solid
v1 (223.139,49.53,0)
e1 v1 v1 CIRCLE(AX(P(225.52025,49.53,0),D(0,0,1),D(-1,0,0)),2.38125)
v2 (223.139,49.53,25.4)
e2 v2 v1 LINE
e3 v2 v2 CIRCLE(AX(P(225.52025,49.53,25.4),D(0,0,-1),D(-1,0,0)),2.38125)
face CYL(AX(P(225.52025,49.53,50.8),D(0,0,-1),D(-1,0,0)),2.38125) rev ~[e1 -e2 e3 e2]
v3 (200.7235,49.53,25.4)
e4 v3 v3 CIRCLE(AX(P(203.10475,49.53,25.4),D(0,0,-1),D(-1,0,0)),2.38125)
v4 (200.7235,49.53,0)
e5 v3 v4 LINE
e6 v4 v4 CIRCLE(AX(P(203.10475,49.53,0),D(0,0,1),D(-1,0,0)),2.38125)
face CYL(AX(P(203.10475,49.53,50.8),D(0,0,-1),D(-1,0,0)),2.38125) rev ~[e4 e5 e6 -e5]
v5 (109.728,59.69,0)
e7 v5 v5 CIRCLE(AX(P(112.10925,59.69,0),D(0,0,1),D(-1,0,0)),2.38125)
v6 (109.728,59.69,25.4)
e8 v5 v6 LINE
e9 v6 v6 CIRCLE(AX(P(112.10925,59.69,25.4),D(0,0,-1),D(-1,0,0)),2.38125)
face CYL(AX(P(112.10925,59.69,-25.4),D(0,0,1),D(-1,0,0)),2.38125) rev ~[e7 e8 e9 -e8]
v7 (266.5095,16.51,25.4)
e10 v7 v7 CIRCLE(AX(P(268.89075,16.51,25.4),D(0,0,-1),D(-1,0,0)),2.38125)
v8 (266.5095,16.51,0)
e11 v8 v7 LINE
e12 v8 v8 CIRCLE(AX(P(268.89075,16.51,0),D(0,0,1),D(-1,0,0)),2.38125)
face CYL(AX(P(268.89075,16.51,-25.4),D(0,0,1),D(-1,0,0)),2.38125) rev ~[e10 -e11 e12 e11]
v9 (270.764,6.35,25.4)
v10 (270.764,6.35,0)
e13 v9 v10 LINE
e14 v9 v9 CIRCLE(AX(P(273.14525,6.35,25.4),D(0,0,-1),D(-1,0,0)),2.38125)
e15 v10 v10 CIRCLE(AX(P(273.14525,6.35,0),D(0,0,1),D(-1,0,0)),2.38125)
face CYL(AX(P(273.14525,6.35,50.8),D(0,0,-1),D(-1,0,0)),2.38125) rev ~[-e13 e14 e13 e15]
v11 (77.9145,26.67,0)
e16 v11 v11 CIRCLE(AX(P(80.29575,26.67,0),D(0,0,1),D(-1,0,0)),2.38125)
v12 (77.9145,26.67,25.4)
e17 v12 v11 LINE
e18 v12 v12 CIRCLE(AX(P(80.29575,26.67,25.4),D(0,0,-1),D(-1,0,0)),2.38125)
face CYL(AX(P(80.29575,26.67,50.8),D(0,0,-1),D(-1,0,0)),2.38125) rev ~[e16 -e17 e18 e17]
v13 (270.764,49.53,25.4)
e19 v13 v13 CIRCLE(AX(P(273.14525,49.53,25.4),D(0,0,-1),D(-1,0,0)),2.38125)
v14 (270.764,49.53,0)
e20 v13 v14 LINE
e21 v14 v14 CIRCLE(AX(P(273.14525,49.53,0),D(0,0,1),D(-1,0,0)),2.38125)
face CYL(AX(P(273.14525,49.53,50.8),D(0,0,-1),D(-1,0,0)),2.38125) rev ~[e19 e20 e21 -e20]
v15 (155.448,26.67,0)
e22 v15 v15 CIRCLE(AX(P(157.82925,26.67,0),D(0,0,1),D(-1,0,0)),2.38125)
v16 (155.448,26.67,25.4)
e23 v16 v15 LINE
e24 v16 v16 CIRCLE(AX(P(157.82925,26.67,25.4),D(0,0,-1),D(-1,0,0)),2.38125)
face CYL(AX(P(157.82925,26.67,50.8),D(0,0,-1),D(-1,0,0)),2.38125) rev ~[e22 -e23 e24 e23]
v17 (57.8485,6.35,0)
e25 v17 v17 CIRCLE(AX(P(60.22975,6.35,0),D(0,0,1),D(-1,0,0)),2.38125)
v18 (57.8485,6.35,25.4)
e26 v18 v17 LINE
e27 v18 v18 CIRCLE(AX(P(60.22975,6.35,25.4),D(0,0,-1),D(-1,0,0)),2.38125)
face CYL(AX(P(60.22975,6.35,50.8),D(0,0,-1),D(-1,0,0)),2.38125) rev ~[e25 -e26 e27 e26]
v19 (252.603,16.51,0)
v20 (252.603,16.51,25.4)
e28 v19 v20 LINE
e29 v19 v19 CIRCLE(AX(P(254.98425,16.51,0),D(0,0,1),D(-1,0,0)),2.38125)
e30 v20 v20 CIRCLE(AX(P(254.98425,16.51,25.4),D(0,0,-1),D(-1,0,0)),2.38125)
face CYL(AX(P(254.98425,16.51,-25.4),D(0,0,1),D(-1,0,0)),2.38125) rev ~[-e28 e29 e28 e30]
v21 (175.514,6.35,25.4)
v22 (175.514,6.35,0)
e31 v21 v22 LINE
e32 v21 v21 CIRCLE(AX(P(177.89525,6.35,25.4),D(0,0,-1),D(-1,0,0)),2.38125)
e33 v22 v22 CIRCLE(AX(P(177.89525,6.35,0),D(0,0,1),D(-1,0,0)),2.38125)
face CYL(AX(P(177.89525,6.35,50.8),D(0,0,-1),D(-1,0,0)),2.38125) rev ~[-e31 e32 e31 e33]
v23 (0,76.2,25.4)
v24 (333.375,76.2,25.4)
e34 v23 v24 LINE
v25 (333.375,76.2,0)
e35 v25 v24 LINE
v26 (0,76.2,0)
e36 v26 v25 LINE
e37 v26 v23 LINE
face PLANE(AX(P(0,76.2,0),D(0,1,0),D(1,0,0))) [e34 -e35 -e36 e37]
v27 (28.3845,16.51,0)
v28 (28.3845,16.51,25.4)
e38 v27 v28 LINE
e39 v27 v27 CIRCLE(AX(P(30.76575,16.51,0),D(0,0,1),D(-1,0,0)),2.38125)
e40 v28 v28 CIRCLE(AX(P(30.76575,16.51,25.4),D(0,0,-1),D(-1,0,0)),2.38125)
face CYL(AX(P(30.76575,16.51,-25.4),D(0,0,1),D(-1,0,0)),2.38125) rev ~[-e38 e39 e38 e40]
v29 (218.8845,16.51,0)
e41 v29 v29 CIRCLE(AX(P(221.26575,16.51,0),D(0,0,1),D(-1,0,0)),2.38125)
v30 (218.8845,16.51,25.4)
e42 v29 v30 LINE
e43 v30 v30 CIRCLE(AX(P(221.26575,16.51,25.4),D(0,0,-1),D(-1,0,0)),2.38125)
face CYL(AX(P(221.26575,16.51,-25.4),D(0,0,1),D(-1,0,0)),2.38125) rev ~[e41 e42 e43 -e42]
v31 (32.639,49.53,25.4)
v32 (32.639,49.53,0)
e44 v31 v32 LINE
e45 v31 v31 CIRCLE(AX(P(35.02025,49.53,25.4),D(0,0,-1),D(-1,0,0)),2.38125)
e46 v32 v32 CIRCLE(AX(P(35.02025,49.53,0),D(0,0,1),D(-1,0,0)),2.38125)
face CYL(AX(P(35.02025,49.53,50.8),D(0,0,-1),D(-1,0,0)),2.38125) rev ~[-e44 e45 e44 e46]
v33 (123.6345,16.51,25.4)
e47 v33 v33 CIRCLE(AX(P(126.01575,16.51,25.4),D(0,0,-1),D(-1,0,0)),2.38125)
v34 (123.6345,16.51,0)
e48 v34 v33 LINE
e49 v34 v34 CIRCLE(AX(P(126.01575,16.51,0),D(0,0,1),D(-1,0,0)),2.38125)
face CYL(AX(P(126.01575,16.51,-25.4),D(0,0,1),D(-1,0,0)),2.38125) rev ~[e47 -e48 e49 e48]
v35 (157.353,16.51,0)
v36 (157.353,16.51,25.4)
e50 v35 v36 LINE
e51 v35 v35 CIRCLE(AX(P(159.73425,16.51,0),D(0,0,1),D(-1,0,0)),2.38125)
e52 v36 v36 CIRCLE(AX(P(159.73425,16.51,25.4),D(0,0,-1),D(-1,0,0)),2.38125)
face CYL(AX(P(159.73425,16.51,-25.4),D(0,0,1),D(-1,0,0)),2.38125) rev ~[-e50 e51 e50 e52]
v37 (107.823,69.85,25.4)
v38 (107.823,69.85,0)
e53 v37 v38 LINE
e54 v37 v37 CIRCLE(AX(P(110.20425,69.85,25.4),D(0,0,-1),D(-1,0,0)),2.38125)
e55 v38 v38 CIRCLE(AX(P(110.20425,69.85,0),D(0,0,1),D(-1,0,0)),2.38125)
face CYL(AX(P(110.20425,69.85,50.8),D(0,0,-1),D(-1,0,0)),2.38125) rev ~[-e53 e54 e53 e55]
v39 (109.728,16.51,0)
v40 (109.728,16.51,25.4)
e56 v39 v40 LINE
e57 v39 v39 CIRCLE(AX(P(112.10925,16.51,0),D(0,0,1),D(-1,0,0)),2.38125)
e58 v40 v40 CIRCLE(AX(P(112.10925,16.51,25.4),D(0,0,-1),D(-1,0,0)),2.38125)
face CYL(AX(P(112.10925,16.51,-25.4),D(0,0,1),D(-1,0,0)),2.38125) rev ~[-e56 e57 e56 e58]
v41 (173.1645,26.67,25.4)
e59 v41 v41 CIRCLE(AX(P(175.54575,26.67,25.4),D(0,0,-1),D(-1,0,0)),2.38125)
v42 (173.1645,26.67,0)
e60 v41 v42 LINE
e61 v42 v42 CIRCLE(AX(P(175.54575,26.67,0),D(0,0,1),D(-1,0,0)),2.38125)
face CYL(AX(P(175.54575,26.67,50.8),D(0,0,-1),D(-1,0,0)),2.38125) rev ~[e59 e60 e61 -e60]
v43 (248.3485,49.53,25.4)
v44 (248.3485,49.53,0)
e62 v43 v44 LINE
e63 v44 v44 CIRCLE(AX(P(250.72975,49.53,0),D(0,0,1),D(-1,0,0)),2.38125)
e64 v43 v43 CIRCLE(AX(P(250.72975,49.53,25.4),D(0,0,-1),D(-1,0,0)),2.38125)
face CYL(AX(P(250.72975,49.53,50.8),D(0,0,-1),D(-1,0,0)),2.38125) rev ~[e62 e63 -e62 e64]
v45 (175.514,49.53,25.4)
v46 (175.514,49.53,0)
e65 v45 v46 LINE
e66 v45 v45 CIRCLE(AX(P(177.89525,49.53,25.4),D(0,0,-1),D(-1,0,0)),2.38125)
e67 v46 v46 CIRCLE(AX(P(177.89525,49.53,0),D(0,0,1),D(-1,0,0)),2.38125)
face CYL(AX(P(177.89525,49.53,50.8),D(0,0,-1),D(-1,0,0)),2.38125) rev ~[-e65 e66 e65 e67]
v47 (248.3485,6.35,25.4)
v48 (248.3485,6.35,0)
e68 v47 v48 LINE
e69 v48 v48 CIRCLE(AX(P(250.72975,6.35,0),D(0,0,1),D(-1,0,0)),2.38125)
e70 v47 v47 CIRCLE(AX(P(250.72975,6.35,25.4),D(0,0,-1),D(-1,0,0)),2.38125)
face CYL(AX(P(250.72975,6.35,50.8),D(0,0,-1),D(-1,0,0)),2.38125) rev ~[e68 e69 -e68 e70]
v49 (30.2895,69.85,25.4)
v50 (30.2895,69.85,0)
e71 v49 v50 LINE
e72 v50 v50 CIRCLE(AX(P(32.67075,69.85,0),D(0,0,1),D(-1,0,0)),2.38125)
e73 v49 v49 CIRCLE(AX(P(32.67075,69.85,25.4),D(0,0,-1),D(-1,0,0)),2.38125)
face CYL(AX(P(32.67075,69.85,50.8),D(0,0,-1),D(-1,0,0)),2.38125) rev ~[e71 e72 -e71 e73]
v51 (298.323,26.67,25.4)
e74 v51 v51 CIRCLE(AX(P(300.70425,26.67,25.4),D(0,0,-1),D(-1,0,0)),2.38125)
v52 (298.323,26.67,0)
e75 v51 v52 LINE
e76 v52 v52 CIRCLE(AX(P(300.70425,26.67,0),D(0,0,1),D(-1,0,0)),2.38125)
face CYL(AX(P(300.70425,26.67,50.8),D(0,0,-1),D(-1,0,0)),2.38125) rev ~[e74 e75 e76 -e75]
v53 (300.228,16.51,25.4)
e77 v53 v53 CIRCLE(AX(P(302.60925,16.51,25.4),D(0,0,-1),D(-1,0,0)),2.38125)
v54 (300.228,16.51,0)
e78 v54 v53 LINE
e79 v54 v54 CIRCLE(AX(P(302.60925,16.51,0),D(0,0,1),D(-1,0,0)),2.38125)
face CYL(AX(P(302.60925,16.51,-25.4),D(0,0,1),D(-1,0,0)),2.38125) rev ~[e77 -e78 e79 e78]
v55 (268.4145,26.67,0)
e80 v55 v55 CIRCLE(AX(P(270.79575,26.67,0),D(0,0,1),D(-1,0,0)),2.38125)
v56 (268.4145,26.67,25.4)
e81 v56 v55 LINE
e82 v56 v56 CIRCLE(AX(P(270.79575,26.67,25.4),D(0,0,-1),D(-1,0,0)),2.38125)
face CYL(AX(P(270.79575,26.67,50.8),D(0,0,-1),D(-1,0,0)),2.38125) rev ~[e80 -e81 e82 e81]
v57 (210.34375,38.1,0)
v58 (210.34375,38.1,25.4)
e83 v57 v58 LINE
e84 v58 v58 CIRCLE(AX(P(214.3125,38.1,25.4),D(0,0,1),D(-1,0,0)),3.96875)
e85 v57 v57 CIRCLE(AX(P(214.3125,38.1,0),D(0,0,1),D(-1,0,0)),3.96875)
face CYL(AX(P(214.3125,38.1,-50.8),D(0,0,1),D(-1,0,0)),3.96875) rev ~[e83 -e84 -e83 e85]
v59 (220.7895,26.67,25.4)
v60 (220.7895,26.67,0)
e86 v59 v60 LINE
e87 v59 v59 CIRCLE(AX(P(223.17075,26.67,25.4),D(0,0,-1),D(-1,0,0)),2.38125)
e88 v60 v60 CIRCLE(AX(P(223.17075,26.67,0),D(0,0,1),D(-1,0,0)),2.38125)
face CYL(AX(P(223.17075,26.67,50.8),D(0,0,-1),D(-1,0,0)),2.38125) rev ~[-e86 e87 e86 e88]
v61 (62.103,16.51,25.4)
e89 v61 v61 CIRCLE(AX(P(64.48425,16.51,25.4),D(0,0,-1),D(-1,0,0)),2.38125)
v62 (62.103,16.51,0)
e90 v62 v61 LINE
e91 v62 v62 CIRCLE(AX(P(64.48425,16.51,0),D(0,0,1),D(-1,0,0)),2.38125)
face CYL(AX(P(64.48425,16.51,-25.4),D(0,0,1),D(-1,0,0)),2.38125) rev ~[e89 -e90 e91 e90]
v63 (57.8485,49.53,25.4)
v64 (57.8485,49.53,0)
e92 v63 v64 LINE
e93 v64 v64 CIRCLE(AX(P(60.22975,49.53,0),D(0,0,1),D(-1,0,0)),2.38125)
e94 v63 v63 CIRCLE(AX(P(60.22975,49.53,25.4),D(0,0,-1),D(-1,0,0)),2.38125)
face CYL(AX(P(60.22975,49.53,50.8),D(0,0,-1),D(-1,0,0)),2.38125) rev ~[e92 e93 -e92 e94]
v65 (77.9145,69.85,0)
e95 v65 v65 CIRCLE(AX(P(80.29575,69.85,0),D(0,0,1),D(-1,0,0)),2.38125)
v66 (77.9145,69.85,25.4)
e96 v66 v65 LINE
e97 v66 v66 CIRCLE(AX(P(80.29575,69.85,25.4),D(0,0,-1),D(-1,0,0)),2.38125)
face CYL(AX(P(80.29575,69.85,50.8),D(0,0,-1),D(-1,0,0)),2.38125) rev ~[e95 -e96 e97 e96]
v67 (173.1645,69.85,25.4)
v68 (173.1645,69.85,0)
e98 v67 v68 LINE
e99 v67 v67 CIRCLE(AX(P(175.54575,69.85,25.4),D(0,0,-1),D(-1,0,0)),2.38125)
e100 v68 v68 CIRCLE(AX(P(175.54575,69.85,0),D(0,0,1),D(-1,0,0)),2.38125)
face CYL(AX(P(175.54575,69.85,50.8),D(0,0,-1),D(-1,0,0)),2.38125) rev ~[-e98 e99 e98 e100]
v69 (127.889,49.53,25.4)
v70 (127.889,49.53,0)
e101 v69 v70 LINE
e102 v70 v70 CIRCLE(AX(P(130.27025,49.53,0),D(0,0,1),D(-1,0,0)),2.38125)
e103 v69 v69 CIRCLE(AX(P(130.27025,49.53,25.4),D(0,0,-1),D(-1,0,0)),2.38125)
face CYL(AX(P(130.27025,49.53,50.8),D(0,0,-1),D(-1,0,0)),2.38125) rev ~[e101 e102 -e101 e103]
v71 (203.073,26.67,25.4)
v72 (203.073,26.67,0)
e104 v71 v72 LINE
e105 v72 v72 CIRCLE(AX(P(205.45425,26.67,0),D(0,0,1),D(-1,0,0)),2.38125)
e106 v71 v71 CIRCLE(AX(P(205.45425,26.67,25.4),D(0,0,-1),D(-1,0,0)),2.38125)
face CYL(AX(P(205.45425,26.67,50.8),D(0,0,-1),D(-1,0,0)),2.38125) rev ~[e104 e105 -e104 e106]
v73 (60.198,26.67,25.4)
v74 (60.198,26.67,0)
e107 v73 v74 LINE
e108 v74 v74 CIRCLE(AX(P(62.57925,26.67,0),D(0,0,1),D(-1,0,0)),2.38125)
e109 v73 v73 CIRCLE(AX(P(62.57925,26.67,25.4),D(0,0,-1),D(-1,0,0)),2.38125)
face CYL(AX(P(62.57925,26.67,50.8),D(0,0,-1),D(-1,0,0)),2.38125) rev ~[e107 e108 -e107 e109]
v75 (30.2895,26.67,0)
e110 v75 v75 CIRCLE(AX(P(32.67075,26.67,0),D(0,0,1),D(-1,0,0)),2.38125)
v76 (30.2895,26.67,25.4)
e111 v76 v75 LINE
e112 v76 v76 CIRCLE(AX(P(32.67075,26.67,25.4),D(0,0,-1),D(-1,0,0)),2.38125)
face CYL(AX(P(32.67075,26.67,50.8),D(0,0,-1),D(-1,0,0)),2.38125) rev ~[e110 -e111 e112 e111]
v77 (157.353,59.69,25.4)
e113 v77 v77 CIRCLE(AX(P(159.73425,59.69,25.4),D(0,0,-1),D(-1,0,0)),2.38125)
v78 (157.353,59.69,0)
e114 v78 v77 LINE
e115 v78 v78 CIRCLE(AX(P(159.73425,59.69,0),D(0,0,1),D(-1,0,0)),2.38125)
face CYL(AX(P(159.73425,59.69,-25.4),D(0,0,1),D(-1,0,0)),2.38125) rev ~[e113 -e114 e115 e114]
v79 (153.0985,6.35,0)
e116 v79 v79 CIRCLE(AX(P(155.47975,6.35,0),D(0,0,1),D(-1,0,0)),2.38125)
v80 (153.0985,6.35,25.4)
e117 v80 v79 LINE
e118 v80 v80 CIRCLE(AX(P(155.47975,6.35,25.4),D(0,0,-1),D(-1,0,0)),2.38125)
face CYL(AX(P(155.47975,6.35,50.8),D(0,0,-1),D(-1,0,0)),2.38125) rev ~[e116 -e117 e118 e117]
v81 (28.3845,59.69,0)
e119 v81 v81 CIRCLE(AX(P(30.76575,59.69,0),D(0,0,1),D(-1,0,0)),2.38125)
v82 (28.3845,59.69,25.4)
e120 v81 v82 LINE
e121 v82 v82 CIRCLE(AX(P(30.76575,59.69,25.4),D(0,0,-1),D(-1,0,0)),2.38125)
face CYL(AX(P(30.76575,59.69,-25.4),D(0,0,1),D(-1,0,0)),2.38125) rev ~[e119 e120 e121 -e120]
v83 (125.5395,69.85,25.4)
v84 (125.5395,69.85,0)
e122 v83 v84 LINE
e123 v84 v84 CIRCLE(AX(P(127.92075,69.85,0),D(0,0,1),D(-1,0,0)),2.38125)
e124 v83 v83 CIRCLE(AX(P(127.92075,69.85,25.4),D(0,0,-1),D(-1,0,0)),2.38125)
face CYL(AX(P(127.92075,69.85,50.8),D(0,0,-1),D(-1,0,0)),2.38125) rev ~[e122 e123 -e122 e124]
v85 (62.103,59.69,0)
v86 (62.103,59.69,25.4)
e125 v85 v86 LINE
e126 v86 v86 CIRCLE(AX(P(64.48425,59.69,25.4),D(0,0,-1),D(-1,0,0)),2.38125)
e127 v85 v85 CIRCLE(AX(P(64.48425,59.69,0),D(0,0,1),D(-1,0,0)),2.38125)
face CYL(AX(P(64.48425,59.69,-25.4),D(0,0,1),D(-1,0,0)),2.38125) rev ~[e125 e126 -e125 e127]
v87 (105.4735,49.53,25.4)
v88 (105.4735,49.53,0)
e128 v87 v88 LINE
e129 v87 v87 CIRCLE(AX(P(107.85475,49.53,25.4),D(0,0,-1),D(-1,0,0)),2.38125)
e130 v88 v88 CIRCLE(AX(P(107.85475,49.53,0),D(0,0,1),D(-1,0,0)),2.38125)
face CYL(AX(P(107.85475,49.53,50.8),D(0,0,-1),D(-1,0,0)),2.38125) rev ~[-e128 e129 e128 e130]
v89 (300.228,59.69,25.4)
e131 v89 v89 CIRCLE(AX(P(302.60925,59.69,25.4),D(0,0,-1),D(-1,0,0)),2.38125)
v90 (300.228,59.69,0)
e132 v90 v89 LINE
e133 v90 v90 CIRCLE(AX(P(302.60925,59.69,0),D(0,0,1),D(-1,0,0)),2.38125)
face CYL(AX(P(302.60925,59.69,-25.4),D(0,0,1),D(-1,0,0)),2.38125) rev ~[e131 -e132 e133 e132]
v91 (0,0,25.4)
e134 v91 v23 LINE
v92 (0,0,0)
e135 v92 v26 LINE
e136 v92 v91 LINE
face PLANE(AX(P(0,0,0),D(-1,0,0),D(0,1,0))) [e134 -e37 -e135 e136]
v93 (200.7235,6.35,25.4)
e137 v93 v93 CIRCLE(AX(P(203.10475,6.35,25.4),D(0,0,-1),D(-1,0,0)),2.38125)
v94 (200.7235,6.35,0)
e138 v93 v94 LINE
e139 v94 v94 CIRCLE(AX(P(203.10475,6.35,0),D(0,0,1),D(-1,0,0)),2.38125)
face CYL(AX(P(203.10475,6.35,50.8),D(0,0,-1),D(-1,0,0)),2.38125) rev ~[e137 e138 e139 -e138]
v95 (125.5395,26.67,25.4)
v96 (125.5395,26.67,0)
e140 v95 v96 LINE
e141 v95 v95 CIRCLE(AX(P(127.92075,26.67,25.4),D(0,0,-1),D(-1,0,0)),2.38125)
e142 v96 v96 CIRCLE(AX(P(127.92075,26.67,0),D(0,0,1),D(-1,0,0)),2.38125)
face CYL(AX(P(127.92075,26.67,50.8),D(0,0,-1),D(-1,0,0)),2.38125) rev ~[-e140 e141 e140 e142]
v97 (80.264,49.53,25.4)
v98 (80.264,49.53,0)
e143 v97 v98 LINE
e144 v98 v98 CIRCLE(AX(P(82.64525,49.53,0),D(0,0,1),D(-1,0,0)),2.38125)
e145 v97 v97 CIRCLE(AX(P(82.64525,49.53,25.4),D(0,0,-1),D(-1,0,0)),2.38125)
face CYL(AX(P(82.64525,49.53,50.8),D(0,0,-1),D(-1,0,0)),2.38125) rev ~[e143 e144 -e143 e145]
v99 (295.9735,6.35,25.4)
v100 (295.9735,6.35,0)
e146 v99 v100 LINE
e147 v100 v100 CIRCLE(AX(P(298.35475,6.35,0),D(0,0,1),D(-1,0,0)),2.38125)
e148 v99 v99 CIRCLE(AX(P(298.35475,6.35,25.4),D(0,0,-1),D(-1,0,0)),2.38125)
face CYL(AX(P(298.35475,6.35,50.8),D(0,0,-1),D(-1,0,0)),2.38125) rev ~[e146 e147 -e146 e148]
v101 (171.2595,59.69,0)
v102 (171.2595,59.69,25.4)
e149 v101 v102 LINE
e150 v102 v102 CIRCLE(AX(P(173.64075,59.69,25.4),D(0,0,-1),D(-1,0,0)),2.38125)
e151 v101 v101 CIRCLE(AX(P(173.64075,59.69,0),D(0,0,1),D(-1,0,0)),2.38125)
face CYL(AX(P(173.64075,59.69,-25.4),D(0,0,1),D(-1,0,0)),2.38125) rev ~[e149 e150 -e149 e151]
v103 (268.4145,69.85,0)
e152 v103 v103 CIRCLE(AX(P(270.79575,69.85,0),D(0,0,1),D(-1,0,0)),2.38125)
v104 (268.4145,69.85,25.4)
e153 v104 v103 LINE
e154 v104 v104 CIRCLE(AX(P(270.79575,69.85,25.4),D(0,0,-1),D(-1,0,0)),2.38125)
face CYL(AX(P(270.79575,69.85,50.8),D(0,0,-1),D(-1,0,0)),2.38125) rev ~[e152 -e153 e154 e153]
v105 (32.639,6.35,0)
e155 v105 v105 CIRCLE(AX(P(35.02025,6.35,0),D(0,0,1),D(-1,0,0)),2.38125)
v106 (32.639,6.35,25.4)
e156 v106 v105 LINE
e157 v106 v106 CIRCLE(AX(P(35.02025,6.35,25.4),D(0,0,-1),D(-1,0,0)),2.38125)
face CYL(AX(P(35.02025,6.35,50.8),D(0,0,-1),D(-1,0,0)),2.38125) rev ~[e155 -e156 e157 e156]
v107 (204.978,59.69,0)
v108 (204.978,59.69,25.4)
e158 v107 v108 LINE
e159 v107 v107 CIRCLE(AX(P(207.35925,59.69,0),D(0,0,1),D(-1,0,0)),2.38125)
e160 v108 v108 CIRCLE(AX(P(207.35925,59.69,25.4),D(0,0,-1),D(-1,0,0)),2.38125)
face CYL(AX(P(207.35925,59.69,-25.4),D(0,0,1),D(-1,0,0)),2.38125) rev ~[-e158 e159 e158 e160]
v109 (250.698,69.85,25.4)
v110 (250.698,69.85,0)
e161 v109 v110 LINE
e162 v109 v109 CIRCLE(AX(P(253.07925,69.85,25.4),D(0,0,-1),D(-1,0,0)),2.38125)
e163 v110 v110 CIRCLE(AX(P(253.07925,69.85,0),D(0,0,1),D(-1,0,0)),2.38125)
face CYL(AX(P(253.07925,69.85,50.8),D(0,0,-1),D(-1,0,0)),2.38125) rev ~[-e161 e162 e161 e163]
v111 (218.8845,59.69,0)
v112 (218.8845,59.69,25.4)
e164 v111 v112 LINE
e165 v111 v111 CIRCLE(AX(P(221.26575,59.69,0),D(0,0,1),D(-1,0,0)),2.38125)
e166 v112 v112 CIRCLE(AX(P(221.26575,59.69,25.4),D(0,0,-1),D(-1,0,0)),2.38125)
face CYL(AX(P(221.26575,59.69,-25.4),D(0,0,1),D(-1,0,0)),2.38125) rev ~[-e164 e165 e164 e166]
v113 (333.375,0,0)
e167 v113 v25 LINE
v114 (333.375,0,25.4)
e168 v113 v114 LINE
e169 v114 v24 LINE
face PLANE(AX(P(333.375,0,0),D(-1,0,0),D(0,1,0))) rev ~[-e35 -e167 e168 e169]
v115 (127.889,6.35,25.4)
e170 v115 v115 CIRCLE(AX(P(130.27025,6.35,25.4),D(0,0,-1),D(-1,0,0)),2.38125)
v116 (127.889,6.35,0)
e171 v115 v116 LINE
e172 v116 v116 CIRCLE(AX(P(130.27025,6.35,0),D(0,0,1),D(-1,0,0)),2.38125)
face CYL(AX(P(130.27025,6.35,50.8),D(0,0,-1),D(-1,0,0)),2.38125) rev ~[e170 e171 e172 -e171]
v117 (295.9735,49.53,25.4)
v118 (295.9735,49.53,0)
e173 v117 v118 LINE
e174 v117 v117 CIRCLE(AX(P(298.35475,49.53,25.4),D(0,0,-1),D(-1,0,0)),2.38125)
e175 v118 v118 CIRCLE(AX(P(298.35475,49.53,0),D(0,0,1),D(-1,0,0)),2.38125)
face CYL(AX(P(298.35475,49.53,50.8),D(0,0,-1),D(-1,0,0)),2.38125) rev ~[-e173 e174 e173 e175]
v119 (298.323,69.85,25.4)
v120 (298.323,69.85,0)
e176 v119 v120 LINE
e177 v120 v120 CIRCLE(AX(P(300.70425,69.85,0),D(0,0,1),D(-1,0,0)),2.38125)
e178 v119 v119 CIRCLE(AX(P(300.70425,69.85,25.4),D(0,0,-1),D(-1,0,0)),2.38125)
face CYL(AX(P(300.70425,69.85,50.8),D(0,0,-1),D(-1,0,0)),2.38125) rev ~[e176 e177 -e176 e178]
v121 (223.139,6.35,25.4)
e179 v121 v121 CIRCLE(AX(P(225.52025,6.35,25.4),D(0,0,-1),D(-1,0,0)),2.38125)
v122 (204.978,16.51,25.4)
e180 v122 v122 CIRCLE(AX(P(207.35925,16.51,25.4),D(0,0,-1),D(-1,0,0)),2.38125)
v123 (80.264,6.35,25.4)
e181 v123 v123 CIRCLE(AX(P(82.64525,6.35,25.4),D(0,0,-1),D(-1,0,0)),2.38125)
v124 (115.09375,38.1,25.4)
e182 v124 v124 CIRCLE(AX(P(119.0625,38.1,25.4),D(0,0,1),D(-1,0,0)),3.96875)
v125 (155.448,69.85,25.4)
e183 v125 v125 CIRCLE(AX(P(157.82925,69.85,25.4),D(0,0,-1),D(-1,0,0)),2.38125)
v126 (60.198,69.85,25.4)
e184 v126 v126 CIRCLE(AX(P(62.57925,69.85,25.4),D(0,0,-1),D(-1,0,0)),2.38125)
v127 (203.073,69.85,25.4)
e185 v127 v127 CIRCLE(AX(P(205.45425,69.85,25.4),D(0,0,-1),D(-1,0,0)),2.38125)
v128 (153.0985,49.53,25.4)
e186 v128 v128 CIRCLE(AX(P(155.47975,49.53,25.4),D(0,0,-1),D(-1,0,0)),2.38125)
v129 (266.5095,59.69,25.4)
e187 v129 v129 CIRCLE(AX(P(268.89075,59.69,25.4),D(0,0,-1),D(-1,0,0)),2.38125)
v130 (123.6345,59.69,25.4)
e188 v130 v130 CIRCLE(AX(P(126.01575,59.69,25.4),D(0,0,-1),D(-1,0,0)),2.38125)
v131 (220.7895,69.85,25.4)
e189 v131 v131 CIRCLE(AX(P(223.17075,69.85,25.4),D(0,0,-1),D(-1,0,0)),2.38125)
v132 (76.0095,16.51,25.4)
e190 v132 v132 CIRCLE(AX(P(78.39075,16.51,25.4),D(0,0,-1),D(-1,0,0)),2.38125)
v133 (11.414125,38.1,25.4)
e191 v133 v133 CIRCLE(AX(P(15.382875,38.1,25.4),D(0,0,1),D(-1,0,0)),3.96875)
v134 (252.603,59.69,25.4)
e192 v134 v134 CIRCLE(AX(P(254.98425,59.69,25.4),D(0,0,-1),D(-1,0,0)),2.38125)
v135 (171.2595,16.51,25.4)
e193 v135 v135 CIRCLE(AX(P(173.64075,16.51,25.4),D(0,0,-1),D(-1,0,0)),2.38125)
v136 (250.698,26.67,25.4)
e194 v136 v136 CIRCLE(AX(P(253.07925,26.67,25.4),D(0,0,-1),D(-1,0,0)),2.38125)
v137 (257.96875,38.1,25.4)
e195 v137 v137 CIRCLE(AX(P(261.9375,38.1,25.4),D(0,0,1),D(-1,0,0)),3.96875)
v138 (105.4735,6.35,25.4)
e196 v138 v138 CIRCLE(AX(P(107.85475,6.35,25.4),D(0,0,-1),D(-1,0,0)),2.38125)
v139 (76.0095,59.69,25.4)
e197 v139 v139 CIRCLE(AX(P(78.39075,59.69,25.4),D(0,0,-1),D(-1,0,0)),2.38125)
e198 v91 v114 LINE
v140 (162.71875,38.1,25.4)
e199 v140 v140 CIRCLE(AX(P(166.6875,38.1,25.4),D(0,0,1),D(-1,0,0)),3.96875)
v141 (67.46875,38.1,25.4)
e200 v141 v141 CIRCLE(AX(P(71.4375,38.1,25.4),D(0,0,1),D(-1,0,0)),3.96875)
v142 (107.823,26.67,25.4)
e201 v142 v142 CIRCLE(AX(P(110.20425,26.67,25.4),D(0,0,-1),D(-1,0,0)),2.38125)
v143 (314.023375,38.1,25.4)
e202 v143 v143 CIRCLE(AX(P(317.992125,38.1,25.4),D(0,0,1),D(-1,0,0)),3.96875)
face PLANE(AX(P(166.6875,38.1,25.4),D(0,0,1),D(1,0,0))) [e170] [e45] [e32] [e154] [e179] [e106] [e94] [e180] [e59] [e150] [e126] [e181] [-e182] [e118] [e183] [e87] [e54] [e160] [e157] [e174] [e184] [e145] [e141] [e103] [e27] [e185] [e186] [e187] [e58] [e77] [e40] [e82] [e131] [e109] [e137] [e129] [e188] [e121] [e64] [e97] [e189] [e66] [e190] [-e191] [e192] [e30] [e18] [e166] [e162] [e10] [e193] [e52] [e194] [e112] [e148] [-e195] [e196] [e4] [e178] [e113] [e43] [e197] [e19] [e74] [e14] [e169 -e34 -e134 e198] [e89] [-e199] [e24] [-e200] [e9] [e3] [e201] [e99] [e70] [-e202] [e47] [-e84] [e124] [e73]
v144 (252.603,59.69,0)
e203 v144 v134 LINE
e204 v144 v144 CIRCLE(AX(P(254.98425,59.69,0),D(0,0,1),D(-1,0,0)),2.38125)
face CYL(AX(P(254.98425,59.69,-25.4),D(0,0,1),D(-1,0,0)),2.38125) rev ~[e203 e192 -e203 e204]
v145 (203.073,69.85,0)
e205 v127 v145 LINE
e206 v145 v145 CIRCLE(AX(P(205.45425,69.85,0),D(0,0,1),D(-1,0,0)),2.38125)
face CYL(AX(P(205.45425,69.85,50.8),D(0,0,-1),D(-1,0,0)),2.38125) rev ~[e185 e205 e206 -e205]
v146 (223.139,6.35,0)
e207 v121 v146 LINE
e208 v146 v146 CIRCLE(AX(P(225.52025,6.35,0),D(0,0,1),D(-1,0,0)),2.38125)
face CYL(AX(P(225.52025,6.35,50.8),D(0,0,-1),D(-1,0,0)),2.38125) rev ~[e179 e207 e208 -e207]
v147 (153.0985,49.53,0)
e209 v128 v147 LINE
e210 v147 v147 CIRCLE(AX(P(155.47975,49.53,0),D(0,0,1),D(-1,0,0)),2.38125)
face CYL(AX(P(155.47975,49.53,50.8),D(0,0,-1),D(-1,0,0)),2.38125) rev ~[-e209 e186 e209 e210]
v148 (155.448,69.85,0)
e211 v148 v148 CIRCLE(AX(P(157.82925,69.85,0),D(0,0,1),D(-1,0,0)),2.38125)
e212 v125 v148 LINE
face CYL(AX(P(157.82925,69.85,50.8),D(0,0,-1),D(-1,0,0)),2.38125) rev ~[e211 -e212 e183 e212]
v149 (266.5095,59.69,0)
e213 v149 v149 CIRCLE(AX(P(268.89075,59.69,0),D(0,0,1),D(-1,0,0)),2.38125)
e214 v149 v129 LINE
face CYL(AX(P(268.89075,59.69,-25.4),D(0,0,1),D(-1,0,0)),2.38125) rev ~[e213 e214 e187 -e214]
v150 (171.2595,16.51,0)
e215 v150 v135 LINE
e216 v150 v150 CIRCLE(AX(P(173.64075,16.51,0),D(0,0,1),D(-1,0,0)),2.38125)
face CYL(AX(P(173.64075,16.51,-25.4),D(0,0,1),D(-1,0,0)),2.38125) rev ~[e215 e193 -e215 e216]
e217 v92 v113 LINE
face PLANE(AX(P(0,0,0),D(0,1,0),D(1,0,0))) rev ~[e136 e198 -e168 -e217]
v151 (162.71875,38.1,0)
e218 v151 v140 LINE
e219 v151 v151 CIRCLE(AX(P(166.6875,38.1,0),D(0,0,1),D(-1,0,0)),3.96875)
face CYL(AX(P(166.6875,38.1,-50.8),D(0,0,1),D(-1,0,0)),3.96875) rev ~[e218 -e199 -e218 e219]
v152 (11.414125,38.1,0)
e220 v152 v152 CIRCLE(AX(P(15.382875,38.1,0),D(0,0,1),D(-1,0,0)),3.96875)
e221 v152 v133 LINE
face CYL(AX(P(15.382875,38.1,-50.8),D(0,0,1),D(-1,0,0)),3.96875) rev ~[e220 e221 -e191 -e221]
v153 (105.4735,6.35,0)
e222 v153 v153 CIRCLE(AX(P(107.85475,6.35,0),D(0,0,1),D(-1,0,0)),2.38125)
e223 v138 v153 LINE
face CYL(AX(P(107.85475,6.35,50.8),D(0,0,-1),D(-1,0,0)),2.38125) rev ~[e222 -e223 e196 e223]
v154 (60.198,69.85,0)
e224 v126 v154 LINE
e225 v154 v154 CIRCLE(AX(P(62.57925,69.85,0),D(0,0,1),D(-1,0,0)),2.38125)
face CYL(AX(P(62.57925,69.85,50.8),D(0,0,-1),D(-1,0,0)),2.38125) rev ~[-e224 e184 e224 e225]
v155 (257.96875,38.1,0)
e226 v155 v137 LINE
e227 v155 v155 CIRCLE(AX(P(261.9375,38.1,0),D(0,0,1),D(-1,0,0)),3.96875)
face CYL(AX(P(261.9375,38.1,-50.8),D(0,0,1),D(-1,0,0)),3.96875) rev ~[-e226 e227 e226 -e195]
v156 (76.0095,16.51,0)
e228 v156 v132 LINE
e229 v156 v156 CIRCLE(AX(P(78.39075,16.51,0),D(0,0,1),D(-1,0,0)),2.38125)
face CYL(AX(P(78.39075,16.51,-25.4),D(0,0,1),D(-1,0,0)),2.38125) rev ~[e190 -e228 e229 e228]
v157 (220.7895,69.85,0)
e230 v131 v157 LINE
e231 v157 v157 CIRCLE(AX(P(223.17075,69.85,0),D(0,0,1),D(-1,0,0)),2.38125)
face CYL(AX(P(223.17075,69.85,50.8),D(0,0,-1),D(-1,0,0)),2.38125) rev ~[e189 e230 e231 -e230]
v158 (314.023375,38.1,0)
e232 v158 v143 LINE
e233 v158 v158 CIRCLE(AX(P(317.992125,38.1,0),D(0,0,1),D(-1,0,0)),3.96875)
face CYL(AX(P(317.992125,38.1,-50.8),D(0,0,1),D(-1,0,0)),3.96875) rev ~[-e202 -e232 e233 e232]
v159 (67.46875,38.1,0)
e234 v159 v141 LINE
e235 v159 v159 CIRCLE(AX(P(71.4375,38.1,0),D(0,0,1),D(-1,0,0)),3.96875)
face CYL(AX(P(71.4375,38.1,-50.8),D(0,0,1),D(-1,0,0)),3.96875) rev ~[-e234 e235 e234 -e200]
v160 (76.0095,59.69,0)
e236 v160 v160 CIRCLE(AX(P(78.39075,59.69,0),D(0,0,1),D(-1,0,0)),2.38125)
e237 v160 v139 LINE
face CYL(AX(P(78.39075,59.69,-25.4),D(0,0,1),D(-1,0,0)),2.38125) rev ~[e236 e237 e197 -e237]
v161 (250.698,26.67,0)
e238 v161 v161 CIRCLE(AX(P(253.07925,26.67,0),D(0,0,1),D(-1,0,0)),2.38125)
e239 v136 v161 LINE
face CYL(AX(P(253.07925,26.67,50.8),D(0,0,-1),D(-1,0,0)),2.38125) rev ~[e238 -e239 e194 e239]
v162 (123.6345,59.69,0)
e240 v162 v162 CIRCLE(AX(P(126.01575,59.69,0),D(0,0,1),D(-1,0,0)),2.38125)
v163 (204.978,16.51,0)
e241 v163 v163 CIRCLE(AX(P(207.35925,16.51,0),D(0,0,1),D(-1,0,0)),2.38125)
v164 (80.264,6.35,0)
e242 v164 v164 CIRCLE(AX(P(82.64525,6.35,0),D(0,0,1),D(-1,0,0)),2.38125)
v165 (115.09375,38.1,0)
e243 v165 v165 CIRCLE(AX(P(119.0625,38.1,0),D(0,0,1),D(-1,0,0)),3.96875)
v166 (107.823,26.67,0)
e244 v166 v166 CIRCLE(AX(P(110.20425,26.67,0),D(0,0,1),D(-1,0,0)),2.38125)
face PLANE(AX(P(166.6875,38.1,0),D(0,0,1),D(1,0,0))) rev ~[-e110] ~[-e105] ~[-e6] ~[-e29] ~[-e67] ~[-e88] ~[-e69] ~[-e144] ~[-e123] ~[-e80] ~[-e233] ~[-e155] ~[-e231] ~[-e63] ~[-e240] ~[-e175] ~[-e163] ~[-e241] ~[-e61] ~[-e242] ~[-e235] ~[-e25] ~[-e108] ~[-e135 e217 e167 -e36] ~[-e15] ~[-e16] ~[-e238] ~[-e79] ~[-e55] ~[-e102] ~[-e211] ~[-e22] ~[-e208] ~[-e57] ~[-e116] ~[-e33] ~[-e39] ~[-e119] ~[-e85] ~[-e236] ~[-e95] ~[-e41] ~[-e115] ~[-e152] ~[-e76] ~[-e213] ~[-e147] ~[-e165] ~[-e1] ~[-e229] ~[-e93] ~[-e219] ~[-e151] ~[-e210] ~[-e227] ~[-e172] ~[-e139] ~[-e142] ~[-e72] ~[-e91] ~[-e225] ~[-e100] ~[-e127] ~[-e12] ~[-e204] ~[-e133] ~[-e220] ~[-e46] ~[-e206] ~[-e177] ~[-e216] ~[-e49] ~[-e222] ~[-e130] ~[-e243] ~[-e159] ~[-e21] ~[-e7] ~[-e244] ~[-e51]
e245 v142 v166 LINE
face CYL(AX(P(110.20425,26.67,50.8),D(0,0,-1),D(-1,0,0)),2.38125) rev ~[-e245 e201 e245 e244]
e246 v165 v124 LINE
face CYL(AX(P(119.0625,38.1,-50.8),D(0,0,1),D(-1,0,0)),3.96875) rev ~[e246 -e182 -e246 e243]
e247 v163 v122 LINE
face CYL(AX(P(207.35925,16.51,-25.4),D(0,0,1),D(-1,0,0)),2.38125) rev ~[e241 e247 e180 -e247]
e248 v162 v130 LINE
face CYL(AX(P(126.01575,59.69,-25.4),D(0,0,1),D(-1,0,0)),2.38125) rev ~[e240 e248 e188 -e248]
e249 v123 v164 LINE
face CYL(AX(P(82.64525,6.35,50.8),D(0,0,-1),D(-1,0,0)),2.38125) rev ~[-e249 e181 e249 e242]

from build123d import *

# Parameters (mm, degrees)
F0_W     = 333.375
F0_H     = 76.2
F1_DEPTH = 25.4
F2_D     = 7.9375
F2_DEPTH = 50.8
F2_TIP   = 2.3846655818
F3_D     = 4.7625
F3_DEPTH = 25.4
F3_TIP   = 1.4307993491
F5_D     = 4.7625
F5_DEPTH = 25.4
F5_TIP   = 1.4307993491


# Not quite as in the source:
# - a feature names something its author has since deleted; it is built from what else it names


with BuildPart() as f1:
    # F0 (on Top) → F1 (new body)
    with BuildSketch(Plane.XY):
        with Locations((166.6875, 38.1)):
            Rectangle(F0_W, F0_H)
    extrude(amount=F1_DEPTH)

    # F2
    with Locations(Plane(origin=(0, 0, 0), x_dir=(1, 0, 0), z_dir=(0, 0, -1))):
        with Locations((15.382875, -38.1), (71.4375, -38.1), (119.0625, -38.1), (166.6875, -38.1), (214.3125, -38.1), (261.9375, -38.1), (317.992125, -38.1)):
            Hole(F2_D / 2, depth=F2_DEPTH)
            with Locations((0, 0, -(F2_DEPTH + F2_TIP / 2))):  # 118° drill point
                Cone(0, F2_D / 2, F2_TIP, mode=Mode.SUBTRACT)

    # F3
    with Locations(Plane(origin=(0, 0, 0), x_dir=(1, 0, 0), z_dir=(0, 0, -1))):
        with Locations((30.76575, -16.51), (64.48425, -16.51), (78.39075, -16.51), (112.10925, -16.51), (126.01575, -16.51), (30.76575, -59.69), (64.48425, -59.69), (78.39075, -59.69), (112.10925, -59.69), (126.01575, -59.69), (159.73425, -59.69), (173.64075, -59.69), (159.73425, -16.51), (173.64075, -16.51), (207.35925, -16.51), (221.26575, -16.51), (254.98425, -16.51), (268.89075, -16.51), (302.60925, -16.51), (207.35925, -59.69), (221.26575, -59.69), (254.98425, -59.69), (268.89075, -59.69), (302.60925, -59.69)):
            Hole(F3_D / 2, depth=F3_DEPTH)
            with Locations((0, 0, -(F3_DEPTH + F3_TIP / 2))):  # 118° drill point
                Cone(0, F3_D / 2, F3_TIP, mode=Mode.SUBTRACT)

    # F5
    with Locations(Plane.XY.offset(25.4)):
        with Locations((32.67075, 69.85), (35.02025, 49.53), (62.57925, 69.85), (60.22975, 49.53), (80.29575, 69.85), (82.64525, 49.53), (110.20425, 69.85), (107.85475, 49.53), (127.92075, 69.85), (130.27025, 49.53), (157.82925, 69.85), (155.47975, 49.53), (175.54575, 69.85), (177.89525, 49.53), (205.45425, 69.85), (203.10475, 49.53), (223.17075, 69.85), (225.52025, 49.53), (253.07925, 69.85), (250.72975, 49.53), (270.79575, 69.85), (273.14525, 49.53), (300.70425, 69.85), (298.35475, 49.53), (32.67075, 26.67), (35.02025, 6.35), (62.57925, 26.67), (60.22975, 6.35), (80.29575, 26.67), (82.64525, 6.35), (110.20425, 26.67), (107.85475, 6.35), (127.92075, 26.67), (130.27025, 6.35), (157.82925, 26.67), (155.47975, 6.35), (175.54575, 26.67), (177.89525, 6.35), (205.45425, 26.67), (203.10475, 6.35), (223.17075, 26.67), (225.52025, 6.35), (253.07925, 26.67), (250.72975, 6.35), (270.79575, 26.67), (273.14525, 6.35), (300.70425, 26.67), (298.35475, 6.35)):
            Hole(F5_D / 2, depth=F5_DEPTH)
            with Locations((0, 0, -(F5_DEPTH + F5_TIP / 2))):  # 118° drill point
                Cone(0, F5_D / 2, F5_TIP, mode=Mode.SUBTRACT)


solid = f1.part
